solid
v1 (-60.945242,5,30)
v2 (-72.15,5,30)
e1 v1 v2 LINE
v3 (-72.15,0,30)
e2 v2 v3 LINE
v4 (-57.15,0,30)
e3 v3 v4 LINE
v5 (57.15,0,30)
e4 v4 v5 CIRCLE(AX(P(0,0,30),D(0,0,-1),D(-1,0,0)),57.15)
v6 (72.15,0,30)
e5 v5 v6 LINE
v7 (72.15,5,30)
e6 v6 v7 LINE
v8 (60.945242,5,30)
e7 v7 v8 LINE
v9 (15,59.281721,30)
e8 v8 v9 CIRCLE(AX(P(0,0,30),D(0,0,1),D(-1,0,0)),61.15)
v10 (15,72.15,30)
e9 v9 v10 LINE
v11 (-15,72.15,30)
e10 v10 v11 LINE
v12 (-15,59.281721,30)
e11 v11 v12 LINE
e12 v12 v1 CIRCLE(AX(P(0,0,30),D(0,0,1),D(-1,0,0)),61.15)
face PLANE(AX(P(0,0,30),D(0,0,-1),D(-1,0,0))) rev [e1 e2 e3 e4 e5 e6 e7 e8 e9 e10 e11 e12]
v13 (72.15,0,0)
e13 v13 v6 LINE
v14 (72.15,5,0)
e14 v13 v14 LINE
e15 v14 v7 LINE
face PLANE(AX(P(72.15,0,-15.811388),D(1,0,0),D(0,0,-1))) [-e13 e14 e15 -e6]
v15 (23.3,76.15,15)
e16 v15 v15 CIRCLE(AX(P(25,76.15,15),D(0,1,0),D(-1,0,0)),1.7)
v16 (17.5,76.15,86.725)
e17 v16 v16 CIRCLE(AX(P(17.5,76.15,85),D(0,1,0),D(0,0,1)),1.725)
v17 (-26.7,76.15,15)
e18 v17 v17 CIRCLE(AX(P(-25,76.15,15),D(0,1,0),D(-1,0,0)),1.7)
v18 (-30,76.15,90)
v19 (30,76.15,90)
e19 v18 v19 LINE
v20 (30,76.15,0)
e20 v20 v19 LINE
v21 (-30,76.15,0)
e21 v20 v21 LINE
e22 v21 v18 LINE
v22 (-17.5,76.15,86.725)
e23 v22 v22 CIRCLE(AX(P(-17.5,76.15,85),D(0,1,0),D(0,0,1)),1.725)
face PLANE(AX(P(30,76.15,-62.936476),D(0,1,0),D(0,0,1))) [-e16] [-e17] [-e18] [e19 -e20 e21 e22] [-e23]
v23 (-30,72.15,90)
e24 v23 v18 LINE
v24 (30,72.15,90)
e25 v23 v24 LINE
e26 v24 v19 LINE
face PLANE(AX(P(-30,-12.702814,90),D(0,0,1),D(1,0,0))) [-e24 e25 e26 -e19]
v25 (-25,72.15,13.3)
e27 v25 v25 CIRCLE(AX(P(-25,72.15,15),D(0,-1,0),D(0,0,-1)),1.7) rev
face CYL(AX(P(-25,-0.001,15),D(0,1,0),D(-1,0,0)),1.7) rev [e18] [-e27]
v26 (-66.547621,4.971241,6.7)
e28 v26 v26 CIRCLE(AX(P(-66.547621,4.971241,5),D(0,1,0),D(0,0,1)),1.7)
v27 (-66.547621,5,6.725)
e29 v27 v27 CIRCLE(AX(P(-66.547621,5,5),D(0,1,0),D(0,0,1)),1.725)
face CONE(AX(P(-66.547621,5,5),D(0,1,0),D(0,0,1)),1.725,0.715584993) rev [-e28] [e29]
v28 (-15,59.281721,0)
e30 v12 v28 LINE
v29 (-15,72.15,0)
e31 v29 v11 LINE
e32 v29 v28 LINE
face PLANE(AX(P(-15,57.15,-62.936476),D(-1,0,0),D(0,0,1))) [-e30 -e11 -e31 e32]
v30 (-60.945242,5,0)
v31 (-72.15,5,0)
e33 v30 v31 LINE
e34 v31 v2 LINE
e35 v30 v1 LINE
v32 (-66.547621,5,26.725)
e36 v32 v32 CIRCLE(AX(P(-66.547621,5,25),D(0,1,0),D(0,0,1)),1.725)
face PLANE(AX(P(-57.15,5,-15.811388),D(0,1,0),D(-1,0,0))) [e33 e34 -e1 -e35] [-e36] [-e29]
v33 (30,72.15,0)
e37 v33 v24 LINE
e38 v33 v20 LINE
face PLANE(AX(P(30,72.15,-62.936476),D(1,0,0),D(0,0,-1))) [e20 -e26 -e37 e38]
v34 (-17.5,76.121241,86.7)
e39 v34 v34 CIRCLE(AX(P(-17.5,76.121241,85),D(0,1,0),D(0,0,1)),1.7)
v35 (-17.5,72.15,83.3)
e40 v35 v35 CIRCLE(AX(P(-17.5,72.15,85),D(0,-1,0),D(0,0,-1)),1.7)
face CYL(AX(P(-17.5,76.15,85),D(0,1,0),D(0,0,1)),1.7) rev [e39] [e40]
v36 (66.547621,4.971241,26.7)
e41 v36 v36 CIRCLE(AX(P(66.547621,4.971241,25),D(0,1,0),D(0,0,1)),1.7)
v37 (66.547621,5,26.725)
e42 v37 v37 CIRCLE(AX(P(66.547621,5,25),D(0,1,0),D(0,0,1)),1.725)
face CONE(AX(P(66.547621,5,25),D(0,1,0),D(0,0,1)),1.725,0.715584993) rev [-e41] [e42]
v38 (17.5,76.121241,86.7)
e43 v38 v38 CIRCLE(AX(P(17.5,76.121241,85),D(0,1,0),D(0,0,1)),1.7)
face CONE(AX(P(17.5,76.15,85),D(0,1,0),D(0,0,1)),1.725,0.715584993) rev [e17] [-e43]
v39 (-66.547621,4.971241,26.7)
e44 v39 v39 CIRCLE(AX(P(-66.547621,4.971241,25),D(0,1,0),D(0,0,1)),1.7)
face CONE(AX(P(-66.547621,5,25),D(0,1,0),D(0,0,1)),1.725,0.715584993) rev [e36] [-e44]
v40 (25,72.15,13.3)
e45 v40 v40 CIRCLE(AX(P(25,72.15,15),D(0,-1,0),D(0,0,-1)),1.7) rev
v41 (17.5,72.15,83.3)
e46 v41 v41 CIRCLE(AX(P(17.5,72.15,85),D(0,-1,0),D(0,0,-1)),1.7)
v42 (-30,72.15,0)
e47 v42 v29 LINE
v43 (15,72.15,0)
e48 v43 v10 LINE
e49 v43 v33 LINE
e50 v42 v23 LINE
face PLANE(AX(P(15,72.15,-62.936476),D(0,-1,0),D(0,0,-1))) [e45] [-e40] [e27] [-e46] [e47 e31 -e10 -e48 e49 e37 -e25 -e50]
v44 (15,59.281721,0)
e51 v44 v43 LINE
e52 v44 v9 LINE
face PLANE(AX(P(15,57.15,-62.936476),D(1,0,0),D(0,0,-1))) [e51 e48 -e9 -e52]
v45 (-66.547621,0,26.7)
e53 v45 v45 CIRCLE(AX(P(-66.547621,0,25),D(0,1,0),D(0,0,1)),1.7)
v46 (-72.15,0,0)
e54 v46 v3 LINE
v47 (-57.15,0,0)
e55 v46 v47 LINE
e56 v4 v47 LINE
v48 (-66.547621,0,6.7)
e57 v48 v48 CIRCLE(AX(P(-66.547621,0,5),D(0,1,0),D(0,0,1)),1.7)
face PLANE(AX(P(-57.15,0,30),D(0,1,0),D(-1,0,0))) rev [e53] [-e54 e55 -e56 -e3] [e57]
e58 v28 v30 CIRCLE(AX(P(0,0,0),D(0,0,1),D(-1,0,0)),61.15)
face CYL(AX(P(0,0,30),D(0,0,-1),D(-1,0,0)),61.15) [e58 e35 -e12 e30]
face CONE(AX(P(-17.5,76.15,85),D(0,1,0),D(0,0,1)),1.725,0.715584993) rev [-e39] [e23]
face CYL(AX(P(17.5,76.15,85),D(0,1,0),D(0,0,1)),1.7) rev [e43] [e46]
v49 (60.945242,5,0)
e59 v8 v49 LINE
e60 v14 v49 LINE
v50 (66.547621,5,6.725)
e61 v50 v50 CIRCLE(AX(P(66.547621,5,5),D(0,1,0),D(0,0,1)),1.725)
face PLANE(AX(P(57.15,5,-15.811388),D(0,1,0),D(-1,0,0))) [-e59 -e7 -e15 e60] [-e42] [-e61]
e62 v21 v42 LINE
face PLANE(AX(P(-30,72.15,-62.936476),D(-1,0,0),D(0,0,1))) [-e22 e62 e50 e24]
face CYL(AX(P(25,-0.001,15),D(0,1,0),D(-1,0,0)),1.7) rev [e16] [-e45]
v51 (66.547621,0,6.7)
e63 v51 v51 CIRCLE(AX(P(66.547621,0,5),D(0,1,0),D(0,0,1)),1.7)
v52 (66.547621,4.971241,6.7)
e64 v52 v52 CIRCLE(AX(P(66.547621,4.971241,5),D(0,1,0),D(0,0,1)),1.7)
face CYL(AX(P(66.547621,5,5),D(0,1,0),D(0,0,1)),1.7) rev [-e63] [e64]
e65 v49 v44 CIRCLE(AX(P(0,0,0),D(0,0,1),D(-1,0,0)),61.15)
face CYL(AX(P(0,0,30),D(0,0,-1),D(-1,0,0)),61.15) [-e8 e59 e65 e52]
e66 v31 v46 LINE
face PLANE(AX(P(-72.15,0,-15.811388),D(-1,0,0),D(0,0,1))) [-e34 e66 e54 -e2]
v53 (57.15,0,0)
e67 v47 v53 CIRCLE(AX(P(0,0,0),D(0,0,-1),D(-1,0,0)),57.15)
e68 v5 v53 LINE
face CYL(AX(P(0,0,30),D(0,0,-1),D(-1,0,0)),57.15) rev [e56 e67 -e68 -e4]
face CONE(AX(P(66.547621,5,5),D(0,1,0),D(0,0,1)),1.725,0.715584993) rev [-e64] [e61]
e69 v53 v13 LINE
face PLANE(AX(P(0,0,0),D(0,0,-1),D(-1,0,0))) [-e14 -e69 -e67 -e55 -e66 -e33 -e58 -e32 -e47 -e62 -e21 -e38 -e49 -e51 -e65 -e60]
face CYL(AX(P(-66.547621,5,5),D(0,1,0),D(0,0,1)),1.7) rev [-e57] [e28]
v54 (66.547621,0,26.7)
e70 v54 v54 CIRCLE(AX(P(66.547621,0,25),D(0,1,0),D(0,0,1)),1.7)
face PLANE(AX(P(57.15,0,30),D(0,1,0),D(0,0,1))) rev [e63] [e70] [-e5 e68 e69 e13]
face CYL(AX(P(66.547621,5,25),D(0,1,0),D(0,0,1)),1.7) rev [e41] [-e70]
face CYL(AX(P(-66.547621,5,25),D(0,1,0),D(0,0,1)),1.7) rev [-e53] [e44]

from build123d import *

# Parameters (mm, degrees)
EXTRUDE_1_DEPTH     = 30
SKETCH_2_W          = 15
SKETCH_2_H          = 5
EXTRUDE_2_DEPTH     = 30
EXTRUDE_3_DEPTH     = 30
CUT_EXTRUDE_1_REACH = 111.107
SKETCH_6_R          = 1.7
SKETCH_7_W          = 60
SKETCH_7_H          = 60
EXTRUDE_4_DEPTH     = 4


# Read off the part's stored shape, not the designer's step: M3 すきま穴1, M3 すきま穴2
with BuildPart() as part:
    # ｽｹｯﾁ1 → ﾎﾞｽ - 押し出し1 (new body)
    with BuildSketch(Plane.XY):
        with BuildLine():
            Line((-57.15, 0), (-61.15, 0))
            ThreePointArc((-61.15, 0), (0, 61.15), (61.15, 0))
            Line((61.15, 0), (57.15, 0))
            ThreePointArc((57.15, 0), (0, 57.15), (-57.15, 0))
        make_face()
    extrude(amount=EXTRUDE_1_DEPTH)

    # ｽｹｯﾁ2 → ﾎﾞｽ - 押し出し2 (add)
    with BuildSketch(Plane.XY.offset(30)):
        with Locations((-64.65, 2.5)):
            Rectangle(SKETCH_2_W, SKETCH_2_H)
        with Locations((64.65, 2.5)):
            Rectangle(SKETCH_2_W, SKETCH_2_H)
    extrude(amount=-EXTRUDE_2_DEPTH)

    # M3 すきま穴1 outline → M3 すきま穴1 (revolve, cut)
    with BuildSketch(Plane(origin=(66.547620908, 0, 25), x_dir=(1, 0, 0), z_dir=(0, 0, 1))):
        Polygon((0, 0), (1.7, 0), (1.7, 4.97124079), (1.725, 5), (0, 5), align=None)
    revolve(axis=Axis((66.547620908, 0, 25), (0, 1, 0)), mode=Mode.SUBTRACT)

    # Hole Wizard M3 _1 2 outline → Hole Wizard M3 _1 2 (revolve, cut)
    with BuildSketch(Plane(origin=(66.547620908, 0, 5), x_dir=(1, 0, 0), z_dir=(0, 0, 1))):
        Polygon((0, 0), (1.7, 0), (1.7, 4.97124079), (1.725, 5), (0, 5), align=None)
    revolve(axis=Axis((66.547620908, 0, 5), (0, 1, 0)), mode=Mode.SUBTRACT)

    # Hole Wizard M3 _1 3 outline → Hole Wizard M3 _1 3 (revolve, cut)
    with BuildSketch(Plane(origin=(-66.547620908, 0, 25), x_dir=(1, 0, 0), z_dir=(0, 0, 1))):
        Polygon((0, 0), (1.7, 0), (1.7, 4.97124079), (1.725, 5), (0, 5), align=None)
    revolve(axis=Axis((-66.547620908, 0, 25), (0, 1, 0)), mode=Mode.SUBTRACT)

    # Hole Wizard M3 _1 4 outline → Hole Wizard M3 _1 4 (revolve, cut)
    with BuildSketch(Plane(origin=(-66.547620908, 0, 5), x_dir=(1, 0, 0), z_dir=(0, 0, 1))):
        Polygon((0, 0), (1.7, 0), (1.7, 4.97124079), (1.725, 5), (0, 5), align=None)
    revolve(axis=Axis((-66.547620908, 0, 5), (0, 1, 0)), mode=Mode.SUBTRACT)

    # ｽｹｯﾁ5 → ﾎﾞｽ - 押し出し3 (add)
    with BuildSketch(Plane.XY.offset(30)):
        Polygon((-15, 57.15), (15, 57.15), (15, 72.15), (30, 72.15), (30, 76.15), (-30, 76.15), (-30, 72.15), (-15, 72.15), align=None)
    extrude(amount=-EXTRUDE_3_DEPTH)

    # ｽｹｯﾁ6 → ｶｯﾄ - 押し出し1 (cut, up to next)
    with BuildSketch(Plane(origin=(0, 76.15, 0), x_dir=(1, 0, 0), z_dir=(0, 1, 0)), mode=Mode.PRIVATE) as cut_extrude_1_sk1:
        with Locations(Location((-25, -15, 0), (0, 0, 180))):
            Circle(SKETCH_6_R)
    cut_extrude_1_tool1 = extrude(cut_extrude_1_sk1.sketch, amount=-CUT_EXTRUDE_1_REACH, mode=Mode.PRIVATE) & part.part
    # ｽｹｯﾁ6 → ｶｯﾄ - 押し出し1 (cut, up to next)
    with BuildSketch(Plane(origin=(0, 76.15, 0), x_dir=(1, 0, 0), z_dir=(0, 1, 0)), mode=Mode.PRIVATE) as cut_extrude_1_sk2:
        with Locations(Location((25, -15, 0), (0, 0, 180))):
            Circle(SKETCH_6_R)
    cut_extrude_1_tool2 = extrude(cut_extrude_1_sk2.sketch, amount=-CUT_EXTRUDE_1_REACH, mode=Mode.PRIVATE) & part.part
    add(cut_extrude_1_tool1.solids().sort_by_distance((-25, 76.15, 15))[0], mode=Mode.SUBTRACT)
    add(cut_extrude_1_tool2.solids().sort_by_distance((25, 76.15, 15))[0], mode=Mode.SUBTRACT)

    # ｽｹｯﾁ7 → ﾎﾞｽ - 押し出し4 (add)
    with BuildSketch(Plane(origin=(0, 76.15, 0), x_dir=(1, 0, 0), z_dir=(0, 1, 0))):
        with Locations((0, -60)):
            Rectangle(SKETCH_7_W, SKETCH_7_H)
    extrude(amount=-EXTRUDE_4_DEPTH)

    # M3 すきま穴2 outline → M3 すきま穴2 (revolve, cut)
    with BuildSketch(Plane(origin=(-17.5, 0, 85), x_dir=(1, 0, 0), z_dir=(0, 0, 1))):
        Polygon((0, 72.15), (1.7, 72.15), (1.7, 76.12124079), (1.725, 76.15), (0, 76.15), align=None)
    revolve(axis=Axis((-17.5, 0, 85), (0, 1, 0)), mode=Mode.SUBTRACT)

    # Hole Wizard M3 _2 2 outline → Hole Wizard M3 _2 2 (revolve, cut)
    with BuildSketch(Plane(origin=(17.5, 0, 85), x_dir=(1, 0, 0), z_dir=(0, 0, 1))):
        Polygon((0, 72.15), (1.7, 72.15), (1.7, 76.12124079), (1.725, 76.15), (0, 76.15), align=None)
    revolve(axis=Axis((17.5, 0, 85), (0, 1, 0)), mode=Mode.SUBTRACT)


solid = part.part
